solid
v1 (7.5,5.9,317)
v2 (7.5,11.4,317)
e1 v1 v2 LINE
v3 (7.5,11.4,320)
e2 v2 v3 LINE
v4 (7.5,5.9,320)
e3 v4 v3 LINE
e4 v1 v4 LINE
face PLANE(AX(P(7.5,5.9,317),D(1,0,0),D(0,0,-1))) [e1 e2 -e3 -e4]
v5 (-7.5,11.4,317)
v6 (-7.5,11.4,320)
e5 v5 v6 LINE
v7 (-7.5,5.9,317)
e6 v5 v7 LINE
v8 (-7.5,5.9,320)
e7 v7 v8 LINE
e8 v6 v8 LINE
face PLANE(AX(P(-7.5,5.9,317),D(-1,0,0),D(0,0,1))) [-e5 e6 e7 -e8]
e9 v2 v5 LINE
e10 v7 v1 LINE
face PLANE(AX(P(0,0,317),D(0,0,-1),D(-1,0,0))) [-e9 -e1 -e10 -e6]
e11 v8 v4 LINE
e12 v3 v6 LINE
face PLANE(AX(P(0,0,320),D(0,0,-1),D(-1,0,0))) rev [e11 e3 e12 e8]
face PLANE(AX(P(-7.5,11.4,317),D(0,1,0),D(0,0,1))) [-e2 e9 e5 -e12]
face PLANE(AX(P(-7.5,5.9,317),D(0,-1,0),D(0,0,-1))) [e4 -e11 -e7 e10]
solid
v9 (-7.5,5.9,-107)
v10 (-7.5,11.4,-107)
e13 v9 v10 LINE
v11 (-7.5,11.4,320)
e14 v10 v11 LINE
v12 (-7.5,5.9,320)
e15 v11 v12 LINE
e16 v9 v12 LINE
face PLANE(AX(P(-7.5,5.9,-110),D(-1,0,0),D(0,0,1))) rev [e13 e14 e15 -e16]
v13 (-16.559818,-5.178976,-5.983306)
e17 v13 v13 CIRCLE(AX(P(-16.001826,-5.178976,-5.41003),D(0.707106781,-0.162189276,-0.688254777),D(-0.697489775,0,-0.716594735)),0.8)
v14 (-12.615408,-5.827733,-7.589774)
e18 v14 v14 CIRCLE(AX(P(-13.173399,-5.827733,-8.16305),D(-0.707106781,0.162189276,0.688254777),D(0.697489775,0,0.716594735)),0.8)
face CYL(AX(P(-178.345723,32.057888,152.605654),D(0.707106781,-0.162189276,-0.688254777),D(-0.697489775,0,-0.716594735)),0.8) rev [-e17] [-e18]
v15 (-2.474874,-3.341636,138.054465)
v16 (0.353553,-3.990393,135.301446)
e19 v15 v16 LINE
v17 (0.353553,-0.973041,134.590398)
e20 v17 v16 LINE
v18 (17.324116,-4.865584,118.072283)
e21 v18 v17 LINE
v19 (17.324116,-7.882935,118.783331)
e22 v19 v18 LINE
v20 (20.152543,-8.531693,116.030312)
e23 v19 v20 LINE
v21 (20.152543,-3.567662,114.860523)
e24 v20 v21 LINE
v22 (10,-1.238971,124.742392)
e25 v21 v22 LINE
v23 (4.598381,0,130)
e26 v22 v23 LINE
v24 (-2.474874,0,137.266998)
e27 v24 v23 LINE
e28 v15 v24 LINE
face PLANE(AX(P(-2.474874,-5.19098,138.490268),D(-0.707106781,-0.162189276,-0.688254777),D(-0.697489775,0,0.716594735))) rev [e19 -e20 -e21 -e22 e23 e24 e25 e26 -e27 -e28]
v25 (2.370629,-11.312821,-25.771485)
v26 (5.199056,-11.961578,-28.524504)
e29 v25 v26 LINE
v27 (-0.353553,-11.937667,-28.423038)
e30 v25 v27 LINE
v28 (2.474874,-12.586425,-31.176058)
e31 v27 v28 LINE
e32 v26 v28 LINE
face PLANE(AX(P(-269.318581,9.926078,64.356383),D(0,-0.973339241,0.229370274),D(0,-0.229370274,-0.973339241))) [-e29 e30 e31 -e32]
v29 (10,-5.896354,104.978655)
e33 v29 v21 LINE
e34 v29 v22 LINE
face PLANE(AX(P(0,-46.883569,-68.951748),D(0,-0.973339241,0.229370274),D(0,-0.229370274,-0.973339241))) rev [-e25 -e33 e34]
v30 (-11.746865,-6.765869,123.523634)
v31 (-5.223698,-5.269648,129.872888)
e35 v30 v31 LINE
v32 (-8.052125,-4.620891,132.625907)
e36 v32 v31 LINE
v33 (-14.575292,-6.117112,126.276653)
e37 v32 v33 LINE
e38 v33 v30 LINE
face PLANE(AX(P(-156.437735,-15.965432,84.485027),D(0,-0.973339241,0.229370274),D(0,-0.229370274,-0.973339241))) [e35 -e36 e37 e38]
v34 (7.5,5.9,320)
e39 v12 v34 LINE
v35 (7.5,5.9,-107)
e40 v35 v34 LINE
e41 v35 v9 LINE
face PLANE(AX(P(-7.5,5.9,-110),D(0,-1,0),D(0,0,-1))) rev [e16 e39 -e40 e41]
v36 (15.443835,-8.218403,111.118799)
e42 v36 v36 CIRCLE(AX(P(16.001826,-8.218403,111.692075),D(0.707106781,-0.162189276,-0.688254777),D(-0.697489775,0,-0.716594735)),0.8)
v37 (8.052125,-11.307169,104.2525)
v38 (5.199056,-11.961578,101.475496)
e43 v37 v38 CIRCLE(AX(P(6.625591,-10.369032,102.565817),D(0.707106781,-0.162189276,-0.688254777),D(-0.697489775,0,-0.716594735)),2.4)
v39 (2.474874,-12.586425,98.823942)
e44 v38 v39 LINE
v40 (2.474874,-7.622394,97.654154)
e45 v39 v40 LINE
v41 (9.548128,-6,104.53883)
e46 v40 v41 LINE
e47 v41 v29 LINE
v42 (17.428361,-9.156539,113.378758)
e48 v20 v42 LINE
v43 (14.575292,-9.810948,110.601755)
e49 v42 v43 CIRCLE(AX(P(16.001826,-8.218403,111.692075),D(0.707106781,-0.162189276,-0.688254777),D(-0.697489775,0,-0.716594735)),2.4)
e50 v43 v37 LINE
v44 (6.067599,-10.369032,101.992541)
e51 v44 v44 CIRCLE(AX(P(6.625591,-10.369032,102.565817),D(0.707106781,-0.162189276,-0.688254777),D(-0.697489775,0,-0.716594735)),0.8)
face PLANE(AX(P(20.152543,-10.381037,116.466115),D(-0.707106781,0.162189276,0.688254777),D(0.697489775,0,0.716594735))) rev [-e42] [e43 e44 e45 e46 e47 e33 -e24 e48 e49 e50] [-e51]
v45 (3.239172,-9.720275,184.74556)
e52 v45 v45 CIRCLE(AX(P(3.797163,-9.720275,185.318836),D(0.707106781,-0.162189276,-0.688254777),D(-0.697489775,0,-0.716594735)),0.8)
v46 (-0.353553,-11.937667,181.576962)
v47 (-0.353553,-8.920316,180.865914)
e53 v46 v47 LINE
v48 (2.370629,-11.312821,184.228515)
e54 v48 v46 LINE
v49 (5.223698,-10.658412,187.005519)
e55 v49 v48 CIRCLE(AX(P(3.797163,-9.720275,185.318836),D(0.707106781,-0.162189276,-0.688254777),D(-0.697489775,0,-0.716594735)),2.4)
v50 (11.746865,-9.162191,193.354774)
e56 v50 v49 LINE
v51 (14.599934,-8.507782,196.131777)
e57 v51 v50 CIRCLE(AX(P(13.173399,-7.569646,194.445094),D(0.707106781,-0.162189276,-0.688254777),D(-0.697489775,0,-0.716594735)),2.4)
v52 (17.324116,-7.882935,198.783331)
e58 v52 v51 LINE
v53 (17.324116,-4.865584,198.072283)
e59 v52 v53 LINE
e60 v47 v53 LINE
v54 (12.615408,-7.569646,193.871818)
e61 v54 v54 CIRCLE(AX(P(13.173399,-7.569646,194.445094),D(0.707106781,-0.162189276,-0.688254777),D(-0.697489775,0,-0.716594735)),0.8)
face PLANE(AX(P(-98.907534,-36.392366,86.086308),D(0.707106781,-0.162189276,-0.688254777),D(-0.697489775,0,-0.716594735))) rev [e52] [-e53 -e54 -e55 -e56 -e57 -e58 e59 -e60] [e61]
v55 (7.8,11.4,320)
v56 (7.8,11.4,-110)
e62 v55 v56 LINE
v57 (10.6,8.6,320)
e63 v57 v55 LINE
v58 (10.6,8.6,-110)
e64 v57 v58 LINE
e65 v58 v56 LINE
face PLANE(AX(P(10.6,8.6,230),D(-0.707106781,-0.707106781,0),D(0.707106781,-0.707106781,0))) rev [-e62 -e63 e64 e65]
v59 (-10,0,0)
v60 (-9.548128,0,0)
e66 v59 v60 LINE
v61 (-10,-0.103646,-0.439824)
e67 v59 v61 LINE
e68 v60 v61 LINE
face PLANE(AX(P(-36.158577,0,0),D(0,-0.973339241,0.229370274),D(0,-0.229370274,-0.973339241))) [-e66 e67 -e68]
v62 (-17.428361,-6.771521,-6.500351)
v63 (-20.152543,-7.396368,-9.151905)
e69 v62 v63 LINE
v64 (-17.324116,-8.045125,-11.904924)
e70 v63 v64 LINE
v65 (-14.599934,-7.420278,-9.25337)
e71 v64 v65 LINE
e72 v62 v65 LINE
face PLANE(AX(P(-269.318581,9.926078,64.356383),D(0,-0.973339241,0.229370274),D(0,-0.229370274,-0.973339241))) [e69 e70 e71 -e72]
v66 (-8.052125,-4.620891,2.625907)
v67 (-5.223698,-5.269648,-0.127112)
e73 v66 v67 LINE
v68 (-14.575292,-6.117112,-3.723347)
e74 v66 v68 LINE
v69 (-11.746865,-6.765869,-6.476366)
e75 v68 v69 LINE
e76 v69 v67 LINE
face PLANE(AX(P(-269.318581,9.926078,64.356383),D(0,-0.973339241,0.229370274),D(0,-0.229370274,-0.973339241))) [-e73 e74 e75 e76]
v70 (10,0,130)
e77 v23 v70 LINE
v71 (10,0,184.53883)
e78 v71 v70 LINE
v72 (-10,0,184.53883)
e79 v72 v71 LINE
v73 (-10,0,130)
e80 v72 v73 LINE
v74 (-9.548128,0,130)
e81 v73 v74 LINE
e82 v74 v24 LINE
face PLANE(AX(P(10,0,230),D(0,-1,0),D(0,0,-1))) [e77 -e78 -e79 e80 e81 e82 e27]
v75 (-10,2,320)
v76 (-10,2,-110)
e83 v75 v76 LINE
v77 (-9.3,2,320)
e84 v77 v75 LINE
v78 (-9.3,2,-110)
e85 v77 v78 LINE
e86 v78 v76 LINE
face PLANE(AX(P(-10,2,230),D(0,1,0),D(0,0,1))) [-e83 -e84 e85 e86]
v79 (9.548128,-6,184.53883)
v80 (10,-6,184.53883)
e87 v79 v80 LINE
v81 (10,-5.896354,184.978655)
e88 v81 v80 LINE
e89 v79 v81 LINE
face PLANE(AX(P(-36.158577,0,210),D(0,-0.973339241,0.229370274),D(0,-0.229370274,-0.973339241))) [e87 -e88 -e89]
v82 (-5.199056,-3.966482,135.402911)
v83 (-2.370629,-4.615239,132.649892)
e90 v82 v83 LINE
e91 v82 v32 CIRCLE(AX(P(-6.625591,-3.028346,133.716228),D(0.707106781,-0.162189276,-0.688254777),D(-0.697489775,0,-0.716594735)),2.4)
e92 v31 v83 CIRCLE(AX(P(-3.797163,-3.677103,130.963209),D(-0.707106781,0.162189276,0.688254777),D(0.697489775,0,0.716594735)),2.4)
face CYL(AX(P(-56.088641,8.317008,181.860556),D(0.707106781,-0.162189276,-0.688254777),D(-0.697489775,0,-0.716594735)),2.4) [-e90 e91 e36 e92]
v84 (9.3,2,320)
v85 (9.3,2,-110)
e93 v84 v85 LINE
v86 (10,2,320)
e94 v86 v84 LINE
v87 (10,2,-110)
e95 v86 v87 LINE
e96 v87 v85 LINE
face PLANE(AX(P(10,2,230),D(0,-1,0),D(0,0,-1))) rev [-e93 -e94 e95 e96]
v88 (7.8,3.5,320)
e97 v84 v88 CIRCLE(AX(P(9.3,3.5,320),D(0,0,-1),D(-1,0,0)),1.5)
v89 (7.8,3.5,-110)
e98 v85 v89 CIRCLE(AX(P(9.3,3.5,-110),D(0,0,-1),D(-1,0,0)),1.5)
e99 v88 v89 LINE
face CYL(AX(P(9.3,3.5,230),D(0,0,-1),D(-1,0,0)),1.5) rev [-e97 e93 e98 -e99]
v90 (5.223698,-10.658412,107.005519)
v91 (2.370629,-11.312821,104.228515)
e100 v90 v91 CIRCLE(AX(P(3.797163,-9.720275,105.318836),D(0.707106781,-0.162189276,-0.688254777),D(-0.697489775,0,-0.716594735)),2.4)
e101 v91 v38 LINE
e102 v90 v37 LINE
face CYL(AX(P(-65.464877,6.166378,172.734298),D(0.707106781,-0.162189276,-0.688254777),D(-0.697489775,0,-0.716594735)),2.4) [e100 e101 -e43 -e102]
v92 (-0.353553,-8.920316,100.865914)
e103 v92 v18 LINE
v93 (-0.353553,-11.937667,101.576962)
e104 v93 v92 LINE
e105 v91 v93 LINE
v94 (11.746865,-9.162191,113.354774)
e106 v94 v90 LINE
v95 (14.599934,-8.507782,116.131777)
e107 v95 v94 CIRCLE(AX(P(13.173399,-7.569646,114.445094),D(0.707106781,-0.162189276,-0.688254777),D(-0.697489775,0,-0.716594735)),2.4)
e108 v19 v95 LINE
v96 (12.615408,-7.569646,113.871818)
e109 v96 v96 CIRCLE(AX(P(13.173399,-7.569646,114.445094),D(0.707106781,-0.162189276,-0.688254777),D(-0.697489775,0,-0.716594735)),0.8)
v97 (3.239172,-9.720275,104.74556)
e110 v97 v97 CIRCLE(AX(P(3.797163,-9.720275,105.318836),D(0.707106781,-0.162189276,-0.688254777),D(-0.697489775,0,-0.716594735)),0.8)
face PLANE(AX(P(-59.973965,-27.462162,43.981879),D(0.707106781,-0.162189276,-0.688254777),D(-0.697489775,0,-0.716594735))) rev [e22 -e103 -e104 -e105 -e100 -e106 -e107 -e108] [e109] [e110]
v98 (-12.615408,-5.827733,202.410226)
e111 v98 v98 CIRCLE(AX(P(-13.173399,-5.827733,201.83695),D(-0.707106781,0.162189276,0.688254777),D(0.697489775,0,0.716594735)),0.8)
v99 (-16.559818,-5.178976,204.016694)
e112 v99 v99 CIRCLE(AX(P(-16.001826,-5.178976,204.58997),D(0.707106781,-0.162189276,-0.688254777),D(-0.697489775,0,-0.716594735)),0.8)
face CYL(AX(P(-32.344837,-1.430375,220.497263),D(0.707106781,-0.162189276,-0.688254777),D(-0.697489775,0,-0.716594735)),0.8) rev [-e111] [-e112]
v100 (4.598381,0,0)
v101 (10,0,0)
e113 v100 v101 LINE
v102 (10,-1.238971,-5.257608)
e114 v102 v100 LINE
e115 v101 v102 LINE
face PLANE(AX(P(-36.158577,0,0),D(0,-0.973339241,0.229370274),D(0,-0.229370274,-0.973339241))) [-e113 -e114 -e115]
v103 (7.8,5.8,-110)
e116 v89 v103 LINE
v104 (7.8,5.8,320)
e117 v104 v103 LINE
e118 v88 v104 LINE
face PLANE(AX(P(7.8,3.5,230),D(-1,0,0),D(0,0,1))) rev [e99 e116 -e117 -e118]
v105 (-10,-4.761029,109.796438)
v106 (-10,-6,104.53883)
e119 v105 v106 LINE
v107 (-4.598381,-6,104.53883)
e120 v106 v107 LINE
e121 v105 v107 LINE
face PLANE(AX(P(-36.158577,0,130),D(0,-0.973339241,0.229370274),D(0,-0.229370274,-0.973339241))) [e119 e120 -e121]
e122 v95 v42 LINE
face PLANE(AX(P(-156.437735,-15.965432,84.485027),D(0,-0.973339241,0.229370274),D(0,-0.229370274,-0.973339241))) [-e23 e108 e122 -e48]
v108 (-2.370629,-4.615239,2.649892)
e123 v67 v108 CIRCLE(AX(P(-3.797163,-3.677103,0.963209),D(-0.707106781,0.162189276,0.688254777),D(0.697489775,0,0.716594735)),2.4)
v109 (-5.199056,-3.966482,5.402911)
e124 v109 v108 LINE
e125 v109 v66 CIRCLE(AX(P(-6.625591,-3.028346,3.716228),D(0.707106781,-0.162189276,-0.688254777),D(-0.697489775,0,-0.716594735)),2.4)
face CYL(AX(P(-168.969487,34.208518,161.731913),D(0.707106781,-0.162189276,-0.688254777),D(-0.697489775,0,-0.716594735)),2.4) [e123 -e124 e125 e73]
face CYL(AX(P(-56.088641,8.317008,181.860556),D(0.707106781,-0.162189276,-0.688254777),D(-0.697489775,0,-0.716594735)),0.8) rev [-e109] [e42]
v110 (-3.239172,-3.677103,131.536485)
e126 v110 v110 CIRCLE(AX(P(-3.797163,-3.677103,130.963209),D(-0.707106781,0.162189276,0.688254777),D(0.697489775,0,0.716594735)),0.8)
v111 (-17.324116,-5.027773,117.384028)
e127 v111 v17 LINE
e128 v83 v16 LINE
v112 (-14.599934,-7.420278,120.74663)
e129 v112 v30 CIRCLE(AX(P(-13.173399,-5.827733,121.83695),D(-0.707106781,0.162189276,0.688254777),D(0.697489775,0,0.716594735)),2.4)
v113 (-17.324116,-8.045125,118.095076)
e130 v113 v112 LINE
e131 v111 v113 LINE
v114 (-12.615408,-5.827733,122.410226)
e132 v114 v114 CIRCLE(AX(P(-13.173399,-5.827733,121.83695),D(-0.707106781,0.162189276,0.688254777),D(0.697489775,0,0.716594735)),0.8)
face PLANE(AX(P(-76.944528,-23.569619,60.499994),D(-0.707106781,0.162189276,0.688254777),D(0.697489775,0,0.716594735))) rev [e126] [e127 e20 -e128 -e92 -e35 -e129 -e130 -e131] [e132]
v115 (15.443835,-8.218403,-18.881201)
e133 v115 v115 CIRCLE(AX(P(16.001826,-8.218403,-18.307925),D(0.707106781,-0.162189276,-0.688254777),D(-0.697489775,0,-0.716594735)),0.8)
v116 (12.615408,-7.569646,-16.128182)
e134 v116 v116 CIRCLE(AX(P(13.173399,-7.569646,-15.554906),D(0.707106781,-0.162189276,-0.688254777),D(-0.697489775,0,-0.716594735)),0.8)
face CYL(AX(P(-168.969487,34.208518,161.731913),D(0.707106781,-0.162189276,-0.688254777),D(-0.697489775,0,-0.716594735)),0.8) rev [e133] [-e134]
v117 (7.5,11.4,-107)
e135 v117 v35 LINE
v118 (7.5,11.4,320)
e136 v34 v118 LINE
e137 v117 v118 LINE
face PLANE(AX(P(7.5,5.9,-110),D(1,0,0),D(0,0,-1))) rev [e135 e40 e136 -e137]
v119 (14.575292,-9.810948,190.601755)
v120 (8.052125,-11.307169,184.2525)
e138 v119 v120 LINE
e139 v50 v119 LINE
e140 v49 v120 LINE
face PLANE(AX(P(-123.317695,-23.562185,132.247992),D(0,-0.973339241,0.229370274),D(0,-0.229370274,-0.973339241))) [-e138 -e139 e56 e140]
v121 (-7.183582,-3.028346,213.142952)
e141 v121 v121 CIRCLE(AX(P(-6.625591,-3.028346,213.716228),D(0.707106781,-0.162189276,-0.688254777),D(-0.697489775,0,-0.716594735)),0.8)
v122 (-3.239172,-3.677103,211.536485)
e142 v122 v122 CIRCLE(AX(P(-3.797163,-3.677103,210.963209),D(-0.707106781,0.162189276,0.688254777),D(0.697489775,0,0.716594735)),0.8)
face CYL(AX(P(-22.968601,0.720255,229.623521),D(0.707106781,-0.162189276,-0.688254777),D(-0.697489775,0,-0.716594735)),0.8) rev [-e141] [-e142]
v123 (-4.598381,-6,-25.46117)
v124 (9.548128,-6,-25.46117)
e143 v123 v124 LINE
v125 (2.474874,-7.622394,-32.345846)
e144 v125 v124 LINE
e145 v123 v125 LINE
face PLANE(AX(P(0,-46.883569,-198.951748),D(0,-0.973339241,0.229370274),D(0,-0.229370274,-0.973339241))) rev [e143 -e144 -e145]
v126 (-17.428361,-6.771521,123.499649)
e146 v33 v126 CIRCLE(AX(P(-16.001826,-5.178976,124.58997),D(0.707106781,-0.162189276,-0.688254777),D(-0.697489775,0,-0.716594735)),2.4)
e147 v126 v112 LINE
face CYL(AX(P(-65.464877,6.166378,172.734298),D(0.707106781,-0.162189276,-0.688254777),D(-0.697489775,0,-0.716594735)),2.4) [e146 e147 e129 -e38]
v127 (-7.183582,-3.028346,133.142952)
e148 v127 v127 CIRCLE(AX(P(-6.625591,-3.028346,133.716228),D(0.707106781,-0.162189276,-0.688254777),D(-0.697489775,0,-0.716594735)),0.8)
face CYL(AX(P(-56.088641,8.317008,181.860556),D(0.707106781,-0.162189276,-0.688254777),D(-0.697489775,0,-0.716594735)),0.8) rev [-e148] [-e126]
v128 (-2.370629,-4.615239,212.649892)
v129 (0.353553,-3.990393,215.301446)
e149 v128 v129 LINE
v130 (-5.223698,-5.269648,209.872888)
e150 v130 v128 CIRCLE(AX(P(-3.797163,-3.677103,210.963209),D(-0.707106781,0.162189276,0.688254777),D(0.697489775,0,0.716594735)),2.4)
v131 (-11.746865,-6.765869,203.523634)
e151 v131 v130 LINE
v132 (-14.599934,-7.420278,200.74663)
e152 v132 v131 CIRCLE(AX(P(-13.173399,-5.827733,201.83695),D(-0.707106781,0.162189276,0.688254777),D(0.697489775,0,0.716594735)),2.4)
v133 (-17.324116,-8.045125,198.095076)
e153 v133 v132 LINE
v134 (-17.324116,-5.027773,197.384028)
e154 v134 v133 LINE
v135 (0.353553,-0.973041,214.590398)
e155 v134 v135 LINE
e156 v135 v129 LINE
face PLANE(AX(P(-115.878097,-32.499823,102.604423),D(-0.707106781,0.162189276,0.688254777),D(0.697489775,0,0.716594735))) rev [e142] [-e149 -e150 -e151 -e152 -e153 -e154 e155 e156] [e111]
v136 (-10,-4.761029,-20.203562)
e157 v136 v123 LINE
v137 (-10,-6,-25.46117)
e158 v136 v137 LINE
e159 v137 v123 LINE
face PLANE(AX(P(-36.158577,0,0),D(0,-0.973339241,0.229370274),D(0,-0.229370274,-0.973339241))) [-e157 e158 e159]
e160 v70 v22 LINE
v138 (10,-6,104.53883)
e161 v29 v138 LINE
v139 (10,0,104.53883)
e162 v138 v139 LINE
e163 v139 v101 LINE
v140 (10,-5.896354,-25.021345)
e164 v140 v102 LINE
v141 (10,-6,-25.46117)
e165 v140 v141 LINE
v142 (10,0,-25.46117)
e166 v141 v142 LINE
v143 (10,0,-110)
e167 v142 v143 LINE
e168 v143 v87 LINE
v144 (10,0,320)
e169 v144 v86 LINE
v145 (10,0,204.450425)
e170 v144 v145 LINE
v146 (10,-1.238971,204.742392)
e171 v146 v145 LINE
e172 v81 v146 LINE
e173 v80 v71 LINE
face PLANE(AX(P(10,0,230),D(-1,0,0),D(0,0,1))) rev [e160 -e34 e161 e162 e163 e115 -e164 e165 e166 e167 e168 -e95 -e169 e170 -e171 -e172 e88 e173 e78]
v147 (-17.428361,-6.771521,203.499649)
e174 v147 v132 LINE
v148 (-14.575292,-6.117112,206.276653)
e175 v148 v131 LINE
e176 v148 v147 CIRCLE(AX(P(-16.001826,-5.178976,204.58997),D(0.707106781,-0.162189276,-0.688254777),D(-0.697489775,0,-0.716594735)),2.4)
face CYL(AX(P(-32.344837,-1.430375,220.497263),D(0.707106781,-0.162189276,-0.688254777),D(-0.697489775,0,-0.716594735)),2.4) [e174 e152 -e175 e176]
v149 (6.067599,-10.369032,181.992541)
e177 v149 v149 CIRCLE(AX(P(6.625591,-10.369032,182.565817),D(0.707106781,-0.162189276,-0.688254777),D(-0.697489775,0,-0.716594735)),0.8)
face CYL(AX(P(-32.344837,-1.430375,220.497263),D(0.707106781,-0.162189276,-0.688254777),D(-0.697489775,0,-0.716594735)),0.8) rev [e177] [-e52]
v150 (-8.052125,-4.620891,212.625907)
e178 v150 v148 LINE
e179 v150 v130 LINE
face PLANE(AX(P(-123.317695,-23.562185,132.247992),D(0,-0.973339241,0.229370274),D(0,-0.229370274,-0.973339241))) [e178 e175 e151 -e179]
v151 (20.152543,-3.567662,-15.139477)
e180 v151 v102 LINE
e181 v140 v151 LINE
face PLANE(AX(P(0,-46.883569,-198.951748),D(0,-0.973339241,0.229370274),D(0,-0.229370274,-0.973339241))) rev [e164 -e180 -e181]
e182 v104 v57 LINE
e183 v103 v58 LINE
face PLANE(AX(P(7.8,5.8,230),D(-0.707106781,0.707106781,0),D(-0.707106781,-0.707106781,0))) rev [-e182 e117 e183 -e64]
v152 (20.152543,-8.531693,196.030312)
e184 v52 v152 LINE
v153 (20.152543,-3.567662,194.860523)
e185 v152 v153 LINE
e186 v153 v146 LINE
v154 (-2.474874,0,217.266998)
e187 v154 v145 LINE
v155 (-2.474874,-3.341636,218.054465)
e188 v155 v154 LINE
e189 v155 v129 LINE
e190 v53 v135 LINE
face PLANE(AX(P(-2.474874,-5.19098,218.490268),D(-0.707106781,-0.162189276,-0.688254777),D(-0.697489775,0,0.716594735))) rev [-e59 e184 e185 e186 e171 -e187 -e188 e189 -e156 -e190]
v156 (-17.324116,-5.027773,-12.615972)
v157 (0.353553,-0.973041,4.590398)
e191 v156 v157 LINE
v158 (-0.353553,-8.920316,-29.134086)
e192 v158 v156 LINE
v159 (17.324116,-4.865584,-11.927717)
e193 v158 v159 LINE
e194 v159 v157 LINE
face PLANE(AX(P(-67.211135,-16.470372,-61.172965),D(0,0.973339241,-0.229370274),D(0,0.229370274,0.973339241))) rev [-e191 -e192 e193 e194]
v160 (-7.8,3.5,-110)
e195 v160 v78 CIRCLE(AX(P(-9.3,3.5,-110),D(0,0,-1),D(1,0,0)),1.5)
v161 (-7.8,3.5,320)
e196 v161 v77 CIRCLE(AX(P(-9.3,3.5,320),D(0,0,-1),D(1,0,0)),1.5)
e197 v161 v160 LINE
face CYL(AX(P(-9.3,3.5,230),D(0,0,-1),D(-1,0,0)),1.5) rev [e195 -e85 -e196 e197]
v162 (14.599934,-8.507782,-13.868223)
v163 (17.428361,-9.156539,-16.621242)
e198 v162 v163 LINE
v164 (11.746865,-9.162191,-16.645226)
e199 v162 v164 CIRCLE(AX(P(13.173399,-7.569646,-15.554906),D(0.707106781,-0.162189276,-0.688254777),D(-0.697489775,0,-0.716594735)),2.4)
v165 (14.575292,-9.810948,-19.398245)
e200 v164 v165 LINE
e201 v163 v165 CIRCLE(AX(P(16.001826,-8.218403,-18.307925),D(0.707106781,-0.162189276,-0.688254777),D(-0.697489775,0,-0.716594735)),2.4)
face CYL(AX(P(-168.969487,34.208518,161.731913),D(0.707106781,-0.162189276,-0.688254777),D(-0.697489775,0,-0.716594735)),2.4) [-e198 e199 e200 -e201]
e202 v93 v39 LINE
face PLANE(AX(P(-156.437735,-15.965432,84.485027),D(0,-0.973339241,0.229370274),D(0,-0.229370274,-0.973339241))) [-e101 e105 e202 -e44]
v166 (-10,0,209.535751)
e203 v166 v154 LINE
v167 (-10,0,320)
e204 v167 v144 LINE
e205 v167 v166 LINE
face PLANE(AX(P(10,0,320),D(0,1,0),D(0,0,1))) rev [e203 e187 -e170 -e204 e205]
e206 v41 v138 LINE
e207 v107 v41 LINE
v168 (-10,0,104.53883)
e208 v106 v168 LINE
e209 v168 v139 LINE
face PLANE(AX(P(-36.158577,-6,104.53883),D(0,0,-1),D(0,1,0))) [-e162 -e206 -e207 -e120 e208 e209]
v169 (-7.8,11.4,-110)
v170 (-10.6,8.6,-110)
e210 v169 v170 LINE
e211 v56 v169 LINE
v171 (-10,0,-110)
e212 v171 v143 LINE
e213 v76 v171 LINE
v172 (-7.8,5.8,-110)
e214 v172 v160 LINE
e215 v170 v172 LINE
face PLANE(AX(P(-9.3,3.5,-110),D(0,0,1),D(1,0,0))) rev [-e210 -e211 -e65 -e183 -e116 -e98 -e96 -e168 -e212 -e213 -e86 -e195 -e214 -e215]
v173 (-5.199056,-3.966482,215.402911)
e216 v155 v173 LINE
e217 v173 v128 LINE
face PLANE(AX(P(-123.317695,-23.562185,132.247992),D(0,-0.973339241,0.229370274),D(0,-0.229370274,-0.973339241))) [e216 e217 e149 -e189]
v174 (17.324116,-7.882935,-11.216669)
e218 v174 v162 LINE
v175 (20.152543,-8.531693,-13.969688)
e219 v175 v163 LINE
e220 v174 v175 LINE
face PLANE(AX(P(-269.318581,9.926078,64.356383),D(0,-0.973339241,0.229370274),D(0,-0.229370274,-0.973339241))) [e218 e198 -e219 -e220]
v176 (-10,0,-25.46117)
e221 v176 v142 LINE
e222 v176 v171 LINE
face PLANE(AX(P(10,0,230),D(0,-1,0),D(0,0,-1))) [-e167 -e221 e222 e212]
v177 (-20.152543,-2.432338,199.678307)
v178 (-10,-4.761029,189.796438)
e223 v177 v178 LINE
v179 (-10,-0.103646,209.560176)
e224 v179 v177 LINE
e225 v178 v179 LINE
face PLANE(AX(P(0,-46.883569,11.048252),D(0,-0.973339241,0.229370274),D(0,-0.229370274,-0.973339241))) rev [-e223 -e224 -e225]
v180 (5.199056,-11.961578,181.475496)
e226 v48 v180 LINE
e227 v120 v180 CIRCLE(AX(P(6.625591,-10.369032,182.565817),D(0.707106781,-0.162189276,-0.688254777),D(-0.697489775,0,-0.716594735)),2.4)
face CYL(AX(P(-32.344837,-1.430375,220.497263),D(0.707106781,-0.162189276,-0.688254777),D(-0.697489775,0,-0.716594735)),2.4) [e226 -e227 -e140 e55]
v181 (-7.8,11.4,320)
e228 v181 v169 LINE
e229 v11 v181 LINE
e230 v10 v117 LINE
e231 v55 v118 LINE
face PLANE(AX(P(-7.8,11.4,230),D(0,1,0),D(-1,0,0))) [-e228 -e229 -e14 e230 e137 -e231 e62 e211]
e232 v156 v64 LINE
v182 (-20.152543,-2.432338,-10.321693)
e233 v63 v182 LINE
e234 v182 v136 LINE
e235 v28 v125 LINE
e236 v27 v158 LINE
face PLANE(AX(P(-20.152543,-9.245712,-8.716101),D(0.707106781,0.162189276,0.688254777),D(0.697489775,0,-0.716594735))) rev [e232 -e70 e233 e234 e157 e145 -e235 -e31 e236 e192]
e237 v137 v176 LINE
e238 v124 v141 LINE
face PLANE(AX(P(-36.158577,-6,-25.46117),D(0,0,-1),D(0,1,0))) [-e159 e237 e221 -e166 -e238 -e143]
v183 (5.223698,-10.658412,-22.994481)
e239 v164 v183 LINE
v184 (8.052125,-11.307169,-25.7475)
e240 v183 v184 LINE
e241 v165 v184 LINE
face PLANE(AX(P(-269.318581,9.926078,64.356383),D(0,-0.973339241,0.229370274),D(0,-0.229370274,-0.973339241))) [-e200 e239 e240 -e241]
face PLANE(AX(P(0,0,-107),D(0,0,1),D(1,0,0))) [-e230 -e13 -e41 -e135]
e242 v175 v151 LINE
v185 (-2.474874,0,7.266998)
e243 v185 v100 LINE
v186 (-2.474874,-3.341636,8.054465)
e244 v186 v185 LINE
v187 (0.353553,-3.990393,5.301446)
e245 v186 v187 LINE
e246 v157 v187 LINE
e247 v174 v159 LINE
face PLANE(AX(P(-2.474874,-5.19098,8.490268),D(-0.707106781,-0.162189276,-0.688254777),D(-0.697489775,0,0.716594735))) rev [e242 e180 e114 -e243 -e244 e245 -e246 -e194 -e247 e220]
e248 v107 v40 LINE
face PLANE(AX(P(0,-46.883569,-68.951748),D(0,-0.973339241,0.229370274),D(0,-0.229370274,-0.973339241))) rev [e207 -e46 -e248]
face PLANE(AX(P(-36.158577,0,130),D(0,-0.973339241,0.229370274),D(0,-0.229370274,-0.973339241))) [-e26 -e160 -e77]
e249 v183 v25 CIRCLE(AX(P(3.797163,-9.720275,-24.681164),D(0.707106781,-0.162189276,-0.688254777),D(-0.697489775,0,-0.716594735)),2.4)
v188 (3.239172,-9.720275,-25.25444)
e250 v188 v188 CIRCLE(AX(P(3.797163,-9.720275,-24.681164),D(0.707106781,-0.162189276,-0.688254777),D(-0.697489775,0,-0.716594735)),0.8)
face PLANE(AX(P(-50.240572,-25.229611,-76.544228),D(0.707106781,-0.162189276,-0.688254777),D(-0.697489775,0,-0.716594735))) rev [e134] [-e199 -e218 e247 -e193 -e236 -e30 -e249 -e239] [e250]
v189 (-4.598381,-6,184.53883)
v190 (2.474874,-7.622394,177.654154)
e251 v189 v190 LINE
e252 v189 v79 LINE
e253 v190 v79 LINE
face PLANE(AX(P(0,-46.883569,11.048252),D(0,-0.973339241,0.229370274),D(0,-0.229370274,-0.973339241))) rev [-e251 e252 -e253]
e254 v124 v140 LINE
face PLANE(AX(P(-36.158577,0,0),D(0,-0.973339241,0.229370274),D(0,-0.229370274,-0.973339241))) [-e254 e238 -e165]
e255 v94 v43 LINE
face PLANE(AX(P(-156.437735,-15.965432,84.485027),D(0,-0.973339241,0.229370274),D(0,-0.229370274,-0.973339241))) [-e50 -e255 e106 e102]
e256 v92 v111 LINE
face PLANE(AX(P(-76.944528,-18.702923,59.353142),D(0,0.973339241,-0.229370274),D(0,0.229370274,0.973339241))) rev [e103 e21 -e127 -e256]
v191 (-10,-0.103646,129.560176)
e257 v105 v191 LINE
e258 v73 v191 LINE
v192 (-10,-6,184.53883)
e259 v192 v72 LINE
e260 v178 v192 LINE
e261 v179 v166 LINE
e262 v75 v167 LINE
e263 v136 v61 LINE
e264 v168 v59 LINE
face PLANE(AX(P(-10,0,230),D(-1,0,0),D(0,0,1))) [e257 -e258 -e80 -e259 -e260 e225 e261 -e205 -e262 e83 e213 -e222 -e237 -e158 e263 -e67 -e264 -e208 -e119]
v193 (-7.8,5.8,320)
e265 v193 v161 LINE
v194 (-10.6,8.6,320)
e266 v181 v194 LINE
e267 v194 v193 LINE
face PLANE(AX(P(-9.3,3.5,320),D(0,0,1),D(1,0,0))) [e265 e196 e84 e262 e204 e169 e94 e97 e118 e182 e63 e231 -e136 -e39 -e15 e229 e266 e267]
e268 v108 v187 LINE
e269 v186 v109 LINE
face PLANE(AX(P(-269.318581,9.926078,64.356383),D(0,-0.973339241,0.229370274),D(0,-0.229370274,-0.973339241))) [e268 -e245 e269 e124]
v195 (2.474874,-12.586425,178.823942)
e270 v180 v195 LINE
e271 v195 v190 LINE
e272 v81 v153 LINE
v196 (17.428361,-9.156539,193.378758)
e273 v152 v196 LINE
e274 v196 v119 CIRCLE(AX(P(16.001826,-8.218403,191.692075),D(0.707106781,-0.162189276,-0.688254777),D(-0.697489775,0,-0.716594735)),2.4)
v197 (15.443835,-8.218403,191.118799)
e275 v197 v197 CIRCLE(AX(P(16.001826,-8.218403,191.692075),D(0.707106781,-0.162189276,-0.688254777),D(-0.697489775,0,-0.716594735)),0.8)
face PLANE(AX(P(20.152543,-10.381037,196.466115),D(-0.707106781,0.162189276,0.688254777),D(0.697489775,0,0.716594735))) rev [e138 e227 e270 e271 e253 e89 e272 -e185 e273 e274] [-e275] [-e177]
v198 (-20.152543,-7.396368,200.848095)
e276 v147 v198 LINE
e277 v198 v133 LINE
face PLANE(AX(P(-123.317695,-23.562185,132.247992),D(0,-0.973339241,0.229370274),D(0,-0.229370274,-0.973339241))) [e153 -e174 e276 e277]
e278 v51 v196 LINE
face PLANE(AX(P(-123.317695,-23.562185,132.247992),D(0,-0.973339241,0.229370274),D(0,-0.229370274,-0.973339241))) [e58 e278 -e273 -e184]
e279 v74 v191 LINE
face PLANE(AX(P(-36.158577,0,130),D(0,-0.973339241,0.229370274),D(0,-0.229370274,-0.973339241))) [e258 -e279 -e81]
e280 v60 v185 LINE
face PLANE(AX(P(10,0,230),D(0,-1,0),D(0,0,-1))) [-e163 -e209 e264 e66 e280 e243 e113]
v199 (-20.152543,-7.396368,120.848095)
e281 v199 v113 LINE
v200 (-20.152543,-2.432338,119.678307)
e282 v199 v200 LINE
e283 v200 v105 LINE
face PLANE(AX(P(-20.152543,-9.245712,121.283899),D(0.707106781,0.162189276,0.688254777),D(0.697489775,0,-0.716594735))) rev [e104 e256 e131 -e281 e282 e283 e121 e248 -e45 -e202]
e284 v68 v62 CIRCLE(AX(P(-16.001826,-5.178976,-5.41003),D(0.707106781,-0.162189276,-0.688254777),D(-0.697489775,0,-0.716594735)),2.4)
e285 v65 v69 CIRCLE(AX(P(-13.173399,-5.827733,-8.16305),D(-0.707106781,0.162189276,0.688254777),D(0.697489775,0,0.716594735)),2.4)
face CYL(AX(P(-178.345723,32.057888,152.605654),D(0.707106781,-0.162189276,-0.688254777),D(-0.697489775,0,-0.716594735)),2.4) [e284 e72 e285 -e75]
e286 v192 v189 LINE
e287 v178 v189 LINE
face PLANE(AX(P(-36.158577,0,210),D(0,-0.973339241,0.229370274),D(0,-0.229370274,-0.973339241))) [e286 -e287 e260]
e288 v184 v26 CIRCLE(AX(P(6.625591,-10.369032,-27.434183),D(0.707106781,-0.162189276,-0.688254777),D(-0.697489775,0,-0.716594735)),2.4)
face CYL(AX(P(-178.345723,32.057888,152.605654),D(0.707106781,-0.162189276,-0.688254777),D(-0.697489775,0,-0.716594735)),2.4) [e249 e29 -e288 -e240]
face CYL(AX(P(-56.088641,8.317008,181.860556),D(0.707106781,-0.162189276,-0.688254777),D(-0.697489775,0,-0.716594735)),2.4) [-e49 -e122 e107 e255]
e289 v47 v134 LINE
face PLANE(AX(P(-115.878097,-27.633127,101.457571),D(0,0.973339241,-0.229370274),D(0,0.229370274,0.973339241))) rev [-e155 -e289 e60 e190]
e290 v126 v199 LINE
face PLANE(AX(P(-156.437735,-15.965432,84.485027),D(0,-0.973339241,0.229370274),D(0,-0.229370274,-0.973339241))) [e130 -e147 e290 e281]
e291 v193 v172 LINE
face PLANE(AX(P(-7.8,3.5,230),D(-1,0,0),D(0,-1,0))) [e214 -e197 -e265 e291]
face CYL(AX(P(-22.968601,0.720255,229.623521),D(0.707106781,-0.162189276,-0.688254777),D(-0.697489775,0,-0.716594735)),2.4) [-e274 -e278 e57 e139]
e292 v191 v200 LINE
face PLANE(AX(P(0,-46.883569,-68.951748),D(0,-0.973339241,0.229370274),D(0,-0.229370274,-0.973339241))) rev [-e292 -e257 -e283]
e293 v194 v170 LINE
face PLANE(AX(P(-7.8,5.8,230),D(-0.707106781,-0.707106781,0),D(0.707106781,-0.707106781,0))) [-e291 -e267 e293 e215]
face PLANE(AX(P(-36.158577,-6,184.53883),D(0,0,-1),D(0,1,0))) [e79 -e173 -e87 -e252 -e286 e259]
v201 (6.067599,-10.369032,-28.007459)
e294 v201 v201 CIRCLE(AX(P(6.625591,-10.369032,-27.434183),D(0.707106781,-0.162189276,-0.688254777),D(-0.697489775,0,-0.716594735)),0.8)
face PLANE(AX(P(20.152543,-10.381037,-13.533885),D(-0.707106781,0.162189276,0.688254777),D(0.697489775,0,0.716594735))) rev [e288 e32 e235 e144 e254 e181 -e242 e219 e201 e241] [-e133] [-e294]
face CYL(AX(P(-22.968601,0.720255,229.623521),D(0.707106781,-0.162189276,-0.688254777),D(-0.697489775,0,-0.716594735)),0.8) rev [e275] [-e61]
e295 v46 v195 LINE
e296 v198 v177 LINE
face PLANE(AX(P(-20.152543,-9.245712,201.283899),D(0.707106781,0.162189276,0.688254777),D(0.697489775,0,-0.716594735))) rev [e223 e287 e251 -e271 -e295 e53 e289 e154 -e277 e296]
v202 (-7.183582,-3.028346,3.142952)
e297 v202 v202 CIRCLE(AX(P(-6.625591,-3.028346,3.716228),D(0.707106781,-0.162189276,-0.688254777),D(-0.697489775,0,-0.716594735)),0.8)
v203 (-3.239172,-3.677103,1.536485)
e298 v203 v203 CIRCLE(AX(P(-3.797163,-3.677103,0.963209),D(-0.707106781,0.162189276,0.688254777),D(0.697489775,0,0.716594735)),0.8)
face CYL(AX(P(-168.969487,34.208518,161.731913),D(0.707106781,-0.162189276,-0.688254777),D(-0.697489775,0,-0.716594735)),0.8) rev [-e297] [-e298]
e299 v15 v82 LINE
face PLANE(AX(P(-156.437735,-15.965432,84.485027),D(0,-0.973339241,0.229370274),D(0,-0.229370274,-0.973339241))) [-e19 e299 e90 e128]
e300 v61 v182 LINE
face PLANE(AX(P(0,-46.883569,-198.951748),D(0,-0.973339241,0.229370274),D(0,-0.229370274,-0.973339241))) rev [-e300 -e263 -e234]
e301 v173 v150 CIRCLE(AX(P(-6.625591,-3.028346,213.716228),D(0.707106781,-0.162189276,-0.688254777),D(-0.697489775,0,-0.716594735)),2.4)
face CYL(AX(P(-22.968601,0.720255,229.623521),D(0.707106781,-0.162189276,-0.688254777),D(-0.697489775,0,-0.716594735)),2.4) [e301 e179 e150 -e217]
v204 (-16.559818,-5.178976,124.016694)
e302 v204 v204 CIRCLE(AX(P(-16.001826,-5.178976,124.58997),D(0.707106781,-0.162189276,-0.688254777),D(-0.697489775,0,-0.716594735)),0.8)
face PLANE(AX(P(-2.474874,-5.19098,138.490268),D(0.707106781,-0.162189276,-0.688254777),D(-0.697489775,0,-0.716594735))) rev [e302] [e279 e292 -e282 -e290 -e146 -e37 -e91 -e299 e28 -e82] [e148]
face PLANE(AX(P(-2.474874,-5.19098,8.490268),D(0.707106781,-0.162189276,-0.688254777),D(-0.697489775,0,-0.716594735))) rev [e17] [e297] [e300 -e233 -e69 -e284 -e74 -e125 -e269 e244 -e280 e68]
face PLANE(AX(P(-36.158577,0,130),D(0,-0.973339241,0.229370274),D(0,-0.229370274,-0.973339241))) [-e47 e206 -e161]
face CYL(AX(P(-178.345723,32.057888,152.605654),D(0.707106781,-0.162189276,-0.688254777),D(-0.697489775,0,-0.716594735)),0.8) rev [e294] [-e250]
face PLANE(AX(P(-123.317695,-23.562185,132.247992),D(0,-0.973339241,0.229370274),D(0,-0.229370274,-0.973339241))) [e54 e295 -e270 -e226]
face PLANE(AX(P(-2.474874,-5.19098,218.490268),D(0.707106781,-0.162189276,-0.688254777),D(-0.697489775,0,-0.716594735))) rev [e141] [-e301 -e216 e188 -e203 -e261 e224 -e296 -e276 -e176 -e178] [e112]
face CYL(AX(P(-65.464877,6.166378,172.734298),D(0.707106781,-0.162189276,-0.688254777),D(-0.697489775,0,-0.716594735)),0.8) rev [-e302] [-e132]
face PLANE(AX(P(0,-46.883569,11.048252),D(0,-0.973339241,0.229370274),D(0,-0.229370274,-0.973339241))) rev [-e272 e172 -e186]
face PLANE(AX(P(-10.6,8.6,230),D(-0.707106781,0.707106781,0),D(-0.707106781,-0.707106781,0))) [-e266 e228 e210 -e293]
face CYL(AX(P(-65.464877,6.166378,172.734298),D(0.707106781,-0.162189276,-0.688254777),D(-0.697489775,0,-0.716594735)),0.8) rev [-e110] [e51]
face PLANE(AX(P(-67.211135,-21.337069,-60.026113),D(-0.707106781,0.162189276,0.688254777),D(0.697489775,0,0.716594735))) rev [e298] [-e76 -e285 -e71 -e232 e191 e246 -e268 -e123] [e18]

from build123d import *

# Parameters (mm, degrees)
EXTRUDE_1_DEPTH        = 230
EXTRUDE_4_DEPTH        = 20
EXTRUDE_5_DEPTH        = 7
CUT_EXTRUDE_2_DEPTH    = 183.949459984
SKETCH_13_R            = 0.8
CUT_EXTRUDE_3_DEPTH    = 185.21813585
CUT_EXTRUDE_START      = -19.466728686
CUT_EXTRUDE_4_DEPTH    = 17.054134169
PATTERN_LINEAR_1_COUNT = 2
PATTERN_LINEAR_1_PITCH = 80
EXTRUDE_START          = -110
EXTRUDE_6_DEPTH        = 110
EXTRUDE_7_DEPTH        = 320
SKETCH_14_W            = 15
SKETCH_14_H            = 5.5
CUT_EXTRUDE_5_DEPTH    = 431.660379744
SKETCH_15_W            = 15
SKETCH_15_H            = 5.5
EXTRUDE_8_DEPTH        = 3
SKETCH_16_W            = 15
SKETCH_16_H            = 5.5
EXTRUDE_9_DEPTH        = 3
PATTERN_LINEAR_2_COUNT = 2
PATTERN_LINEAR_2_PITCH = 210


# Read off the part's stored shape, not the designer's step: 切除-拉伸4
with BuildPart() as part:
    # 草图1 → 凸台-拉伸1 (new body)
    with BuildSketch(Plane.XY):
        with BuildLine():
            Line((10, 0), (-10, 0))
            Line((-10, 0), (-10, 2))
            Line((-10, 2), (-9.3, 2))
            ThreePointArc((-9.3, 2), (-8.239339828, 2.439339828), (-7.8, 3.5))
            Line((-7.8, 3.5), (-7.8, 5.8))
            Line((-7.8, 5.8), (-10.6, 8.6))
            Line((-10.6, 8.6), (-7.8, 11.4))
            Line((-7.8, 11.4), (7.8, 11.4))
            Line((7.8, 11.4), (10.6, 8.6))
            Line((10.6, 8.6), (7.8, 5.8))
            Line((7.8, 5.8), (7.8, 3.5))
            ThreePointArc((7.8, 3.5), (8.239339828, 2.439339828), (9.3, 2))
            Line((9.3, 2), (10, 2))
            Line((10, 2), (10, 0))
        make_face()
    extrude(amount=EXTRUDE_1_DEPTH)

    # 草图6 → 凸台-拉伸4 (add)
    with BuildSketch(Plane(origin=(10, 0, 0), x_dir=(0, 0, -1), z_dir=(1, 0, 0))):
        Polygon((-210, 0), (-184.538830434, -6), (-184.538830434, 0), align=None)
    extrude_4 = extrude(amount=-EXTRUDE_4_DEPTH)

    # 草图9 → 凸台-拉伸5 (add)
    with BuildSketch(Plane(origin=(0, -46.883568579, 11.04825176), x_dir=(1, 0, 0), z_dir=(0, -0.9733392406205545, 0.2293702741599314))):
        Polygon((-2.474873734, 211.474495246), (20.152543264, 188.847078248), (2.474873734, 171.169408719), (-20.152543264, 193.796825717), align=None)
    extrude_5 = extrude(amount=EXTRUDE_5_DEPTH)

    # 草图12 → 切除-拉伸2 (cut, through all)
    with BuildSketch(Plane(origin=(104.499810756, 23.969150243, 101.713766446), x_dir=(0.6708344230619809, 0.1538694755336464, -0.7254690629751898), z_dir=(0.7071067811865466, 0.16218927626110527, 0.6882547774377598))):
        Polygon((-157.172081563, -5.77097041), (-155.591240381, -1.027454714), (-132.82236504, -8.615492386), (-134.403206222, -13.359008082), align=None)
    cut_extrude_2 = extrude(amount=-CUT_EXTRUDE_2_DEPTH, mode=Mode.SUBTRACT)

    # 草图13 → 切除-拉伸3 (cut, through all)
    with BuildSketch(Plane(origin=(-84.347267492, 19.346755869, 82.098505289), x_dir=(-0.6708344230619789, 0.1538694755336449, -0.725469062975192), z_dir=(0.707106781186549, -0.16218927626110477, -0.6882547774377574))):
        with BuildLine():
            Line((-145.787643892, -9.564989246), (-145.186924243, -7.762453281))
            Line((-145.186924243, -7.762453281), (-149.562889479, -6.304103294))
            ThreePointArc((-149.562889479, -6.304103294), (-151.824611116, -6.709831328), (-153.390762633, -5.028412455))
            Line((-153.390762633, -5.028412455), (-157.045713483, -3.810350327))
            Line((-157.045713483, -3.810350327), (-157.646433132, -5.612886292))
            Line((-157.646433132, -5.612886292), (-145.787643892, -9.564989246))
        make_face()
        with BuildLine():
            Line((-140.810959007, -9.220803269), (-145.186924243, -7.762453281))
            Line((-145.186924243, -7.762453281), (-145.787643892, -9.564989246))
            Line((-145.787643892, -9.564989246), (-133.928854652, -13.5170922))
            Line((-133.928854652, -13.5170922), (-133.328135003, -11.714556236))
            Line((-133.328135003, -11.714556236), (-136.983085853, -10.496494108))
            ThreePointArc((-136.983085853, -10.496494108), (-139.24480749, -10.902222142), (-140.810959007, -9.220803269))
        make_face()
        with Locations(Location((-151.065807349, -4.432943794, 0), (0, 0, 351.029025291))):
            Circle(SKETCH_13_R)
        with Locations(Location((-138.486003723, -8.625334607, 0), (0, 0, 351.029025291))):
            Circle(SKETCH_13_R)
    cut_extrude_3 = extrude(amount=-CUT_EXTRUDE_3_DEPTH, mode=Mode.SUBTRACT)

    # 切除-拉伸4 outline → 切除-拉伸4 (cut)
    with BuildSketch(Plane(origin=(0, -53.696943263, 12.653843679), x_dir=(1, 0, 0), z_dir=(0, -0.9733392406205545, 0.2293702741599314)).offset(CUT_EXTRUDE_START)):
        Polygon((7.8, 201.199621512), (10, 198.999621512), (10.6, 198.399621512), (10.6, 225.840609701), (7.8, 226.482846468), (-7.8, 226.482846468), (-10.6, 225.840609701), (-10.6, 203.349368981), (-2.474873734, 211.474495246), align=None)
    extrude(amount=CUT_EXTRUDE_4_DEPTH, mode=Mode.SUBTRACT)

    # 阵列(线性)1: 凸台-拉伸4, 凸台-拉伸5, 切除-拉伸2, 切除-拉伸3 ×2
    with Locations(*[(0, 0, -i * PATTERN_LINEAR_1_PITCH) for i in range(1, PATTERN_LINEAR_1_COUNT)]):
        add(extrude_4)
        add(extrude_5)
        add(cut_extrude_2, mode=Mode.SUBTRACT)
        add(cut_extrude_3, mode=Mode.SUBTRACT)

    # 草图1<3> → 凸台-拉伸6 (add)
    with BuildSketch(Plane.XY.offset(EXTRUDE_START)):
        with BuildLine():
            Line((10, 0), (-10, 0))
            Line((-10, 0), (-10, 2))
            Line((-10, 2), (-9.3, 2))
            ThreePointArc((-9.3, 2), (-8.239339828, 2.439339828), (-7.8, 3.5))
            Line((-7.8, 3.5), (-7.8, 5.8))
            Line((-7.8, 5.8), (-10.6, 8.6))
            Line((-10.6, 8.6), (-7.8, 11.4))
            Line((-7.8, 11.4), (7.8, 11.4))
            Line((7.8, 11.4), (10.6, 8.6))
            Line((10.6, 8.6), (7.8, 5.8))
            Line((7.8, 5.8), (7.8, 3.5))
            ThreePointArc((7.8, 3.5), (8.239339828, 2.439339828), (9.3, 2))
            Line((9.3, 2), (10, 2))
            Line((10, 2), (10, 0))
        make_face()
    extrude(amount=EXTRUDE_6_DEPTH)

    # 草图1<4> → 凸台-拉伸7 (add)
    with BuildSketch(Plane.XY):
        with BuildLine():
            Line((10, 0), (-10, 0))
            Line((-10, 0), (-10, 2))
            Line((-10, 2), (-9.3, 2))
            ThreePointArc((-9.3, 2), (-8.239339828, 2.439339828), (-7.8, 3.5))
            Line((-7.8, 3.5), (-7.8, 5.8))
            Line((-7.8, 5.8), (-10.6, 8.6))
            Line((-10.6, 8.6), (-7.8, 11.4))
            Line((-7.8, 11.4), (7.8, 11.4))
            Line((7.8, 11.4), (10.6, 8.6))
            Line((10.6, 8.6), (7.8, 5.8))
            Line((7.8, 5.8), (7.8, 3.5))
            ThreePointArc((7.8, 3.5), (8.239339828, 2.439339828), (9.3, 2))
            Line((9.3, 2), (10, 2))
            Line((10, 2), (10, 0))
        make_face()
    extrude(amount=EXTRUDE_7_DEPTH)

    # 草图14 → 切除-拉伸5 (cut, through all)
    with BuildSketch(Plane.XY.offset(320)):
        with Locations((0, 8.65)):
            Rectangle(SKETCH_14_W, SKETCH_14_H)
    extrude(amount=-CUT_EXTRUDE_5_DEPTH, mode=Mode.SUBTRACT)

    # 草图15 → 凸台-拉伸8 (add)
    with BuildSketch(Plane(origin=(0, 0, -110), x_dir=(-1, 0, 0), z_dir=(0, 0, -1))):
        with Locations((0, 8.65)):
            Rectangle(SKETCH_15_W, SKETCH_15_H)
    extrude(amount=-EXTRUDE_8_DEPTH)

    # 阵列(线性)2: 凸台-拉伸4, 凸台-拉伸5, 切除-拉伸2, 切除-拉伸3 ×2
    with Locations(*[(0, 0, -i * PATTERN_LINEAR_2_PITCH) for i in range(1, PATTERN_LINEAR_2_COUNT)]):
        add(extrude_4)
        add(extrude_5)
        add(cut_extrude_2, mode=Mode.SUBTRACT)
        add(cut_extrude_3, mode=Mode.SUBTRACT)


with BuildPart() as body_2:
    # 草图16 → 凸台-拉伸9 (new body)
    with BuildSketch(Plane.XY.offset(320)):
        with Locations((0, 8.65)):
            Rectangle(SKETCH_16_W, SKETCH_16_H)
    extrude(amount=-EXTRUDE_9_DEPTH)


solid = Compound([part.part, body_2.part])
